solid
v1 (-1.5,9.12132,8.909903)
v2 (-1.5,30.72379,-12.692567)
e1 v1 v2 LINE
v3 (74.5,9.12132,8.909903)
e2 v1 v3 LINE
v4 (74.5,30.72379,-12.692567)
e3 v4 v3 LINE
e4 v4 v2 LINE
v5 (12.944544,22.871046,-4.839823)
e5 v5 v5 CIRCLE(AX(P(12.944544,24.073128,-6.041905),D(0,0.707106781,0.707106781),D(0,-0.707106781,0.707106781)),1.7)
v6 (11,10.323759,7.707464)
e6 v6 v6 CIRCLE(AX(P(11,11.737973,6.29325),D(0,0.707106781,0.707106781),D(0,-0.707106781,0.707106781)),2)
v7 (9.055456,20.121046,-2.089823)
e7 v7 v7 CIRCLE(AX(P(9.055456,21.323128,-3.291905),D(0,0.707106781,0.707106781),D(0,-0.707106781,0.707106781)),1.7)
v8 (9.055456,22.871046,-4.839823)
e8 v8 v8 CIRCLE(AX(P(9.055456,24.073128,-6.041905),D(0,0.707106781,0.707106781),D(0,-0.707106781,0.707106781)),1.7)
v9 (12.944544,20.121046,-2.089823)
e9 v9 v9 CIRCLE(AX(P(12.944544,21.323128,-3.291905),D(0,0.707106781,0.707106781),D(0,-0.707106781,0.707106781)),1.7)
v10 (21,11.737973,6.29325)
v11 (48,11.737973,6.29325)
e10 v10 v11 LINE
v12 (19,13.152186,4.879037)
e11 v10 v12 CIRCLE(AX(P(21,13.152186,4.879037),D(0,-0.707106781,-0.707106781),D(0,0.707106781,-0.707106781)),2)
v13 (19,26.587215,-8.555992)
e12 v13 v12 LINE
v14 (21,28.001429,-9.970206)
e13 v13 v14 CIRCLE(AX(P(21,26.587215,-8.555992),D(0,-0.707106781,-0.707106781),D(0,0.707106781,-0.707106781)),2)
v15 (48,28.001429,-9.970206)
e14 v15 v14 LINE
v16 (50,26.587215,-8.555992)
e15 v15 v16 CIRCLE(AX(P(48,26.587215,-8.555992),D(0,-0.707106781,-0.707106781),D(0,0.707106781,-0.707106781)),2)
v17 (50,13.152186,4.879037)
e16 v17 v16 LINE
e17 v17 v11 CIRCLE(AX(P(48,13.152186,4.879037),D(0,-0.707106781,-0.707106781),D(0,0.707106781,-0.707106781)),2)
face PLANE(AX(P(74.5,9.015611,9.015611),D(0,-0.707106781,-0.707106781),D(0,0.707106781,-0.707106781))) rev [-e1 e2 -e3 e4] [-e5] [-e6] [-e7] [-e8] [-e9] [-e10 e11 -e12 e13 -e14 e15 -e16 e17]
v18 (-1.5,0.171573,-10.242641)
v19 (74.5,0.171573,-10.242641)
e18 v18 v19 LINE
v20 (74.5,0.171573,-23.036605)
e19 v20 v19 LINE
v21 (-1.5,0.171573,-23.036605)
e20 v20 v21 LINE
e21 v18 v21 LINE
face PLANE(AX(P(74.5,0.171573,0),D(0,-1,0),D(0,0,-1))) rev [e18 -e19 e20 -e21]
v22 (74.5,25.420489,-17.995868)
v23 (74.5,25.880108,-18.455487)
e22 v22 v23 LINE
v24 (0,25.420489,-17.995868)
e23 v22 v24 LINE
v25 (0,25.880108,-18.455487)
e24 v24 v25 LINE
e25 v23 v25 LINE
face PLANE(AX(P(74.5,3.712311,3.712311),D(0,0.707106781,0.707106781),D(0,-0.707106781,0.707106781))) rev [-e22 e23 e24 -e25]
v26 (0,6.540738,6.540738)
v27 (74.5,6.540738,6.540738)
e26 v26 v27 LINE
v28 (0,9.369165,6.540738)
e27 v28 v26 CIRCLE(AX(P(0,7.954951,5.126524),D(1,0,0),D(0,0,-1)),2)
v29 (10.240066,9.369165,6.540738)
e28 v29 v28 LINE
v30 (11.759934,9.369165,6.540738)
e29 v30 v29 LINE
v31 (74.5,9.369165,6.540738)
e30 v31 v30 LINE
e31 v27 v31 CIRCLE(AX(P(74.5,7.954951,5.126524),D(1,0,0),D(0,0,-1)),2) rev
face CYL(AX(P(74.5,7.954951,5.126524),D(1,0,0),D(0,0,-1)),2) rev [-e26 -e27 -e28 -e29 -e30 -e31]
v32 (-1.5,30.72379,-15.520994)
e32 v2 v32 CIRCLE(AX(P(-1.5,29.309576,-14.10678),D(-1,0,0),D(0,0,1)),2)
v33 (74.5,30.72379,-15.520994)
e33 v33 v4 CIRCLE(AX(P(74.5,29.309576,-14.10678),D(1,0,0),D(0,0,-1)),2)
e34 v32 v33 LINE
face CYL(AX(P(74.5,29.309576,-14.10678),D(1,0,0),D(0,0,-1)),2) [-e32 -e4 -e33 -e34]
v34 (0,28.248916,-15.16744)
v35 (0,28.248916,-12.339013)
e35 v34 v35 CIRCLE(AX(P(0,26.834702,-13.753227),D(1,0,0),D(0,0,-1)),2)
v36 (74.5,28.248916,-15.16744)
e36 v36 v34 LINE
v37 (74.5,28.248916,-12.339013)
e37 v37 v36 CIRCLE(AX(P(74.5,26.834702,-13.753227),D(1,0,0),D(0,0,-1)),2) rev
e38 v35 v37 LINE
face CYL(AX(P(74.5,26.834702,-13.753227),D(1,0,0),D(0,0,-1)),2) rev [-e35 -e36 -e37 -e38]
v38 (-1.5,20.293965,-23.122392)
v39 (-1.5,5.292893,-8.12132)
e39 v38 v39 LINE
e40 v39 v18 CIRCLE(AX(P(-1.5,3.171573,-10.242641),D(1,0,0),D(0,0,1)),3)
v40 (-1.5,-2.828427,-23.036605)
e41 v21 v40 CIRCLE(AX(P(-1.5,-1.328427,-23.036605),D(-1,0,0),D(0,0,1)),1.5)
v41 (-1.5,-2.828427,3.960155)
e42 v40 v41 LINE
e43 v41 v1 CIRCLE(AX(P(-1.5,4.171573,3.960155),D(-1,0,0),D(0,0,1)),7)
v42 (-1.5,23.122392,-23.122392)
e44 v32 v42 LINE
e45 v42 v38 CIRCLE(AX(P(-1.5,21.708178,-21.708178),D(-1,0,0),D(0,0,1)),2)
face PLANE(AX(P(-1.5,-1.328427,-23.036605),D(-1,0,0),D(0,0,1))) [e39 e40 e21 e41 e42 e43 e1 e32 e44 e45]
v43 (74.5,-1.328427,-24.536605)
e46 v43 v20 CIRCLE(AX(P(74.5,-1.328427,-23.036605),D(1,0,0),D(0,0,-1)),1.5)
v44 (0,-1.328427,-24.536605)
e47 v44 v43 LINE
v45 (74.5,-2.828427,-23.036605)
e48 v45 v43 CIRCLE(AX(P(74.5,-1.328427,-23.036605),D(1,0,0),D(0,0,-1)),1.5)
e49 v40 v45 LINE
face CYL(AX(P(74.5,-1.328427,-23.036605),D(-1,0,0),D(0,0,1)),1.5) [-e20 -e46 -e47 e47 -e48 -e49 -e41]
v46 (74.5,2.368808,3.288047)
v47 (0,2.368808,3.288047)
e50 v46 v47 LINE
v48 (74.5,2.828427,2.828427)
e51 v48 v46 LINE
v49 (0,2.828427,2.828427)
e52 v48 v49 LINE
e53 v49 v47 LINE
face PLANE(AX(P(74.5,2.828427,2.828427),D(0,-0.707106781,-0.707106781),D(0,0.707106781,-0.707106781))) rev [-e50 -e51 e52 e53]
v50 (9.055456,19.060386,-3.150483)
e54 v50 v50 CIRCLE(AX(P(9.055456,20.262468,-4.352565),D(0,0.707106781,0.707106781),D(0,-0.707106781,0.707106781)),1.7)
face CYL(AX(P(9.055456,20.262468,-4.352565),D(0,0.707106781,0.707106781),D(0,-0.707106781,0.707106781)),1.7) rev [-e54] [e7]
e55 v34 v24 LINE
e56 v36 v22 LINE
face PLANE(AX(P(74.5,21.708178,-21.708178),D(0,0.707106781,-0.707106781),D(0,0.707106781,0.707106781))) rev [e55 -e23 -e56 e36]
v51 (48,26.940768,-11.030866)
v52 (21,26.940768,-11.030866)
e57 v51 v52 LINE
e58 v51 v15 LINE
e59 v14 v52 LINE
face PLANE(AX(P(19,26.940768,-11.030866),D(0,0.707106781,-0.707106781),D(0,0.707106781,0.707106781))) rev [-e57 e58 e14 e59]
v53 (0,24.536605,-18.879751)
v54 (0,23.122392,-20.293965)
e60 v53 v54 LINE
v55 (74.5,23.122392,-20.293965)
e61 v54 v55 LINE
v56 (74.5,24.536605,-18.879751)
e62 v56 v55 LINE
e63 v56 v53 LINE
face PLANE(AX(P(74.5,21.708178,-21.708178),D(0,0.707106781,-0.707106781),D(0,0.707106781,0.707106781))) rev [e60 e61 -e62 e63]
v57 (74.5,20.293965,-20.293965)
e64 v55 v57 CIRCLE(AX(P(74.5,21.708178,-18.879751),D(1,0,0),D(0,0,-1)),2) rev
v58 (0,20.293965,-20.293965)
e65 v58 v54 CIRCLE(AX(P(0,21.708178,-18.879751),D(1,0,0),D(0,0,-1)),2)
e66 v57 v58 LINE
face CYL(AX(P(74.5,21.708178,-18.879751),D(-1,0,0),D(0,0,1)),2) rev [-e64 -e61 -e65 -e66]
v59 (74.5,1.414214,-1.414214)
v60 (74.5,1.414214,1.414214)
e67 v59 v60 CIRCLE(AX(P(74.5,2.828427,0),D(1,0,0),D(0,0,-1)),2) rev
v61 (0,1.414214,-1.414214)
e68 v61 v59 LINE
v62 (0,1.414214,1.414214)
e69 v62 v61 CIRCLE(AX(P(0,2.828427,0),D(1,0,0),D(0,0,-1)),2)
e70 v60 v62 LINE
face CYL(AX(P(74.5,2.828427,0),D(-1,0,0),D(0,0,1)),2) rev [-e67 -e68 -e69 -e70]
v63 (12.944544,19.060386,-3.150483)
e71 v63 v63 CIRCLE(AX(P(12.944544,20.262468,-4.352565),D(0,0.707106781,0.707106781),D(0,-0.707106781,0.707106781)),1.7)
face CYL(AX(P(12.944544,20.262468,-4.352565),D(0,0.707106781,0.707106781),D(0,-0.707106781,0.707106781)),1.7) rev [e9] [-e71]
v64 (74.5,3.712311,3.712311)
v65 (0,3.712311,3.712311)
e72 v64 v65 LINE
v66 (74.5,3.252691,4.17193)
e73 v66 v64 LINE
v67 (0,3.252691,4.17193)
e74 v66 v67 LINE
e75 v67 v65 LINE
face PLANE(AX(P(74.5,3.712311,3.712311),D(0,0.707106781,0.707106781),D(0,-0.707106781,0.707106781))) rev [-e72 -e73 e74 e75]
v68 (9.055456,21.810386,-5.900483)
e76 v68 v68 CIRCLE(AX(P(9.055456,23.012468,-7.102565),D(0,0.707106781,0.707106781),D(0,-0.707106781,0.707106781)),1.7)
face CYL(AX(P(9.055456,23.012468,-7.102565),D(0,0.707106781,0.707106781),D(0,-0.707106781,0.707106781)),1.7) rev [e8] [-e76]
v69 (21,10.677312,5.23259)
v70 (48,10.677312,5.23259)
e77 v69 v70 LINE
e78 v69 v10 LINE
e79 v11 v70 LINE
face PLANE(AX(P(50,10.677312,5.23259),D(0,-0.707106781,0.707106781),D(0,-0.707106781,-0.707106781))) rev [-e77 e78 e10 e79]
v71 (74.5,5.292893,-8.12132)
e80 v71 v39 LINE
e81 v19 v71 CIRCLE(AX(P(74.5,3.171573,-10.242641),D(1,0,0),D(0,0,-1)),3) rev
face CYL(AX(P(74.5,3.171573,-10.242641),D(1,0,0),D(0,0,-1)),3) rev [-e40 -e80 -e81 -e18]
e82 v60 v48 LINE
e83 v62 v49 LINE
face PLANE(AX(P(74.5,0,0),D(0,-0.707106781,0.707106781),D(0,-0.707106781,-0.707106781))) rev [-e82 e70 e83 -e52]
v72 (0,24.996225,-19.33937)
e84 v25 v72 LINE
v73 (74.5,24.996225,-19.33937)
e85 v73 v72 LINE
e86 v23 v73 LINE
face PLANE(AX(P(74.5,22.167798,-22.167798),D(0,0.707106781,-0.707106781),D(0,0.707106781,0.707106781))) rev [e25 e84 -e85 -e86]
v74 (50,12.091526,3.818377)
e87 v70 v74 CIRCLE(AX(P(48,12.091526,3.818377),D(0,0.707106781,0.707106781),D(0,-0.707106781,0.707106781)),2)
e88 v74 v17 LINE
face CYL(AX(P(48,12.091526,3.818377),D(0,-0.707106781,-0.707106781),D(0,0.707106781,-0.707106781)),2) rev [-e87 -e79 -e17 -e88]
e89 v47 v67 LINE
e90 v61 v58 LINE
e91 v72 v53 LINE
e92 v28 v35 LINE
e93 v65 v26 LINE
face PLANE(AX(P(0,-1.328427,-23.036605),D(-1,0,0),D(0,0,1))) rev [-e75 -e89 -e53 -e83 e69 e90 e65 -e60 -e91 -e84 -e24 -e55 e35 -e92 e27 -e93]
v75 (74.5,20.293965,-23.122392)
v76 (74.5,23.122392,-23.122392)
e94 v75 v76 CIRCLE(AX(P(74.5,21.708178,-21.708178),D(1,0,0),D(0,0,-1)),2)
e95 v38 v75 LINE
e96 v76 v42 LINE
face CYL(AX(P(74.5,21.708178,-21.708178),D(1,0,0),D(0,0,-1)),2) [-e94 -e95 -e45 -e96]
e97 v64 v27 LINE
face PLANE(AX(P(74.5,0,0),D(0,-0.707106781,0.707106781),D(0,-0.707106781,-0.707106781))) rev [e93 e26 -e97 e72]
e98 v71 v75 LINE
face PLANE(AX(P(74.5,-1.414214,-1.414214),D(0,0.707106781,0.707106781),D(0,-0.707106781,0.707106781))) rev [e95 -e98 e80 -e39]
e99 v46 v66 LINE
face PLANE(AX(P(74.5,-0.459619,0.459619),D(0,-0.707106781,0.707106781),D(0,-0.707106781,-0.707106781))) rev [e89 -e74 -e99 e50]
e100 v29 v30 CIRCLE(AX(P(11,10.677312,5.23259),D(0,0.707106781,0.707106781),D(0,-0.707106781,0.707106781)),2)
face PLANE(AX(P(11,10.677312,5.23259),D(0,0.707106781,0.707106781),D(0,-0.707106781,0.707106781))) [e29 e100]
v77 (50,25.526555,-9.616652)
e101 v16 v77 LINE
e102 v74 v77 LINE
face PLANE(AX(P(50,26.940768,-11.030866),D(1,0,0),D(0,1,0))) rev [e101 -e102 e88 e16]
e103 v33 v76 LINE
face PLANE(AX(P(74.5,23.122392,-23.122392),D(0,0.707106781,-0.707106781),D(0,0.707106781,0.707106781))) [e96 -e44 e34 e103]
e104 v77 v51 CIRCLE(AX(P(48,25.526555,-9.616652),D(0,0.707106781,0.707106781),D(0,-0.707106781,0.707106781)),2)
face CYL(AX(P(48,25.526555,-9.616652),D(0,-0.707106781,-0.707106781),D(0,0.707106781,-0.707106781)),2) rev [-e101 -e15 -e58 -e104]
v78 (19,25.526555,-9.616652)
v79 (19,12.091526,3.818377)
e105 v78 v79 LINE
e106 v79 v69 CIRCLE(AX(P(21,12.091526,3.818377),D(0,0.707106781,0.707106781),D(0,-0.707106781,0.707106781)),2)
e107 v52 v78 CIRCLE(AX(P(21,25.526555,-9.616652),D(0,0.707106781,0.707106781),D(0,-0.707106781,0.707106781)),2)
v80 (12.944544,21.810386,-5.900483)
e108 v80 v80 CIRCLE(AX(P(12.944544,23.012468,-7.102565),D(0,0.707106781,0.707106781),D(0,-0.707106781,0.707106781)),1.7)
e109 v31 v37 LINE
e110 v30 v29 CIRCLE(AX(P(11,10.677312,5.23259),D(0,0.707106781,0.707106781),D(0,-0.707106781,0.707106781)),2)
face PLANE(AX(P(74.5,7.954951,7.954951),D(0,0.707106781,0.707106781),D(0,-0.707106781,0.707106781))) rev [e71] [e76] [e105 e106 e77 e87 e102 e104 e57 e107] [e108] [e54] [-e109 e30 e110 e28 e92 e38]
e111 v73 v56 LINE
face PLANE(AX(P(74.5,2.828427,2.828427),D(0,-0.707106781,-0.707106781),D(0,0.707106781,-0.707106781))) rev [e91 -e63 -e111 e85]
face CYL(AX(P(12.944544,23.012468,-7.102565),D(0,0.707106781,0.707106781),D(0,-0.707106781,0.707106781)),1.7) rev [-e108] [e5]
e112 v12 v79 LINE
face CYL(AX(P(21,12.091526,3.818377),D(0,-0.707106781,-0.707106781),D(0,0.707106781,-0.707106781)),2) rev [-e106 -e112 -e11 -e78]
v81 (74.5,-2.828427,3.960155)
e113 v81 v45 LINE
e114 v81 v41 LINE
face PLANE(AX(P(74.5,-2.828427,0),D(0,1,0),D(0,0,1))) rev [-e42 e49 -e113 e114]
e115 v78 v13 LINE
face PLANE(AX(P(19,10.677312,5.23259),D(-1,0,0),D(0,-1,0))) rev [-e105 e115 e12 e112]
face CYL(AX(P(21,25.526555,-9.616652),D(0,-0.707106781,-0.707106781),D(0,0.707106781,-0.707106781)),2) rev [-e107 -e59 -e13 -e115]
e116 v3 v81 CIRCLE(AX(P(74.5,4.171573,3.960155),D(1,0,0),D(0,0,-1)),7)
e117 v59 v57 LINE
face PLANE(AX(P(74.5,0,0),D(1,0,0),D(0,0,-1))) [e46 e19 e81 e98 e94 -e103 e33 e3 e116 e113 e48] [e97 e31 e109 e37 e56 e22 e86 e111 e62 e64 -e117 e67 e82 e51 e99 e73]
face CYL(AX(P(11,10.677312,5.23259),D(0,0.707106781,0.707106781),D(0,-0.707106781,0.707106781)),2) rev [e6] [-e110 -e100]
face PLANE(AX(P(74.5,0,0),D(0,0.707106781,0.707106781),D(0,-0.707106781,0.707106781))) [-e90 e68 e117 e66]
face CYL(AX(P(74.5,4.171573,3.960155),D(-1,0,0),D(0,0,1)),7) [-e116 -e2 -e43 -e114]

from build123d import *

# Parameters (mm, degrees)
BOSS_EXTRUDE1_DEPTH = 74.5
FILLET1_R           = 7
FILLET2_R           = 2
FILLET3_R           = 1.5
FILLET4_R           = 3
SKETCH3_R           = 2
SKETCH3_R_2         = 1.7
SKETCH3_W           = 31
SKETCH3_H           = 23
CUT_EXTRUDE1_DEPTH  = 1.5
FILLET5_R           = 2
BOSS_EXTRUDE3_DEPTH = 1.5


with BuildPart() as part:
    # Sketch1 → Boss-Extrude1 (new body)
    with BuildSketch(Plane(origin=(0, 0, 0), x_dir=(0, 0, -1), z_dir=(1, 0, 0))):
        Polygon((-20.859650045, -2.828427125), (0, -2.828427125), (24.536605307, -2.828427125), (24.536605307, 0.171572875), (3, 0.171572875), (24.536605307, 21.708178182), (14.106780285, 32.138003205), (-10.429825023, 7.601397898), align=None)
        Polygon((19.339370465, 24.996224715), (18.879751058, 24.536605307), (21.708178182, 21.708178182), (0, 0), (-2.828427125, 2.828427125), (-3.288046533, 2.368807717), (-4.171930009, 3.252691193), (-3.712310601, 3.712310601), (-7.954951288, 7.954951288), (13.753226894, 29.663129471), (17.995867581, 25.420488784), (18.455486989, 25.880108191), align=None, mode=Mode.SUBTRACT)
    extrude(amount=BOSS_EXTRUDE1_DEPTH)

    # Fillet1
    fillet1_edges = [part.edges().sort_by_distance(p)[0] for p in [
        (37.25, -2.828427125, 20.859650045),
    ]]
    fillet(fillet1_edges, radius=FILLET1_R)

    # Fillet2
    fillet2_edges = [part.edges().sort_by_distance(p)[0] for p in [
        (37.25, 32.138003205, -14.106780285),
        (37.25, 21.708178182, -24.536605307),
        (37.25, 29.663129471, -13.753226894),
        (37.25, 7.954951288, 7.954951288),
        (37.25, 0, 0),
        (37.25, 21.708178182, -21.708178182),
    ]]
    fillet(fillet2_edges, radius=FILLET2_R)

    # Fillet3
    fillet3_edges = [part.edges().sort_by_distance(p)[0] for p in [
        (37.25, -2.828427125, -24.536605307),
        (37.25, 0.171572875, -24.536605307),
    ]]
    fillet(fillet3_edges, radius=FILLET3_R - 0.0001)  # a hair under: the kernel refuses the full size

    # Fillet4
    fillet4_edges = [part.edges().sort_by_distance(p)[0] for p in [
        (37.25, 0.171572875, -3),
    ]]
    fillet(fillet4_edges, radius=FILLET4_R)

    # Sketch3 → Cut-Extrude1 (cut)
    with BuildSketch(Plane(origin=(0, 9.01561146, 9.01561146), x_dir=(1, 0, 0), z_dir=(0, 0.7071067811865475, 0.7071067811865476))):
        with Locations(Location((11, 3.85, 0), (0, 0, 270))):
            Circle(SKETCH3_R)
        with Locations(Location((12.944543648, 17.405456352, 0), (0, 0, 270))):
            Circle(SKETCH3_R_2)
        with Locations(Location((12.944543648, 21.294543648, 0), (0, 0, 270))):
            Circle(SKETCH3_R_2)
        with Locations(Location((9.055456352, 21.294543648, 0), (0, 0, 270))):
            Circle(SKETCH3_R_2)
        with Locations(Location((9.055456352, 17.405456352, 0), (0, 0, 270))):
            Circle(SKETCH3_R_2)
        with Locations((34.5, 15.35)):
            Rectangle(SKETCH3_W, SKETCH3_H)
    extrude(amount=-CUT_EXTRUDE1_DEPTH, mode=Mode.SUBTRACT)

    # Fillet5
    fillet5_edges = [part.edges().sort_by_distance(p)[0] for p in [
        (19, 11.207642482, 5.762920267),
        (19, 27.471098449, -10.500535701),
        (50, 27.471098449, -10.500535701),
        (50, 11.207642482, 5.762920267),
    ]]
    fillet(fillet5_edges, radius=FILLET5_R)

    # Sketch4 → Boss-Extrude3 (add)
    with BuildSketch(Plane.ZY):
        with BuildLine():
            Line((-23.036605307, -2.828427125), (3.960155108, -2.828427125))
            ThreePointArc((3.960155108, -2.828427125), (10.427311836, 1.492788849), (8.909902577, 9.121320344))
            Line((8.909902577, 9.121320344), (-12.692566722, 30.723789643))
            ThreePointArc((-12.692566722, 30.723789643), (-14.106780285, 31.30957608), (-15.520993847, 30.723789643))
            Line((-15.520993847, 30.723789643), (-23.122391745, 23.122391745))
            ThreePointArc((-23.122391745, 23.122391745), (-23.708178182, 21.708178182), (-23.122391745, 20.29396462))
            Line((-23.122391745, 20.29396462), (-8.121320344, 5.292893219))
            ThreePointArc((-8.121320344, 5.292893219), (-7.47100209, 2.023522578), (-10.242640687, 0.171572875))
            Line((-10.242640687, 0.171572875), (-23.036605307, 0.171572875))
            ThreePointArc((-23.036605307, 0.171572875), (-24.097265479, -0.267766953), (-24.536605307, -1.328427125))
            ThreePointArc((-24.536605307, -1.328427125), (-24.097265479, -2.389087297), (-23.036605307, -2.828427125))
        make_face()
    extrude(amount=BOSS_EXTRUDE3_DEPTH)


solid = part.part
